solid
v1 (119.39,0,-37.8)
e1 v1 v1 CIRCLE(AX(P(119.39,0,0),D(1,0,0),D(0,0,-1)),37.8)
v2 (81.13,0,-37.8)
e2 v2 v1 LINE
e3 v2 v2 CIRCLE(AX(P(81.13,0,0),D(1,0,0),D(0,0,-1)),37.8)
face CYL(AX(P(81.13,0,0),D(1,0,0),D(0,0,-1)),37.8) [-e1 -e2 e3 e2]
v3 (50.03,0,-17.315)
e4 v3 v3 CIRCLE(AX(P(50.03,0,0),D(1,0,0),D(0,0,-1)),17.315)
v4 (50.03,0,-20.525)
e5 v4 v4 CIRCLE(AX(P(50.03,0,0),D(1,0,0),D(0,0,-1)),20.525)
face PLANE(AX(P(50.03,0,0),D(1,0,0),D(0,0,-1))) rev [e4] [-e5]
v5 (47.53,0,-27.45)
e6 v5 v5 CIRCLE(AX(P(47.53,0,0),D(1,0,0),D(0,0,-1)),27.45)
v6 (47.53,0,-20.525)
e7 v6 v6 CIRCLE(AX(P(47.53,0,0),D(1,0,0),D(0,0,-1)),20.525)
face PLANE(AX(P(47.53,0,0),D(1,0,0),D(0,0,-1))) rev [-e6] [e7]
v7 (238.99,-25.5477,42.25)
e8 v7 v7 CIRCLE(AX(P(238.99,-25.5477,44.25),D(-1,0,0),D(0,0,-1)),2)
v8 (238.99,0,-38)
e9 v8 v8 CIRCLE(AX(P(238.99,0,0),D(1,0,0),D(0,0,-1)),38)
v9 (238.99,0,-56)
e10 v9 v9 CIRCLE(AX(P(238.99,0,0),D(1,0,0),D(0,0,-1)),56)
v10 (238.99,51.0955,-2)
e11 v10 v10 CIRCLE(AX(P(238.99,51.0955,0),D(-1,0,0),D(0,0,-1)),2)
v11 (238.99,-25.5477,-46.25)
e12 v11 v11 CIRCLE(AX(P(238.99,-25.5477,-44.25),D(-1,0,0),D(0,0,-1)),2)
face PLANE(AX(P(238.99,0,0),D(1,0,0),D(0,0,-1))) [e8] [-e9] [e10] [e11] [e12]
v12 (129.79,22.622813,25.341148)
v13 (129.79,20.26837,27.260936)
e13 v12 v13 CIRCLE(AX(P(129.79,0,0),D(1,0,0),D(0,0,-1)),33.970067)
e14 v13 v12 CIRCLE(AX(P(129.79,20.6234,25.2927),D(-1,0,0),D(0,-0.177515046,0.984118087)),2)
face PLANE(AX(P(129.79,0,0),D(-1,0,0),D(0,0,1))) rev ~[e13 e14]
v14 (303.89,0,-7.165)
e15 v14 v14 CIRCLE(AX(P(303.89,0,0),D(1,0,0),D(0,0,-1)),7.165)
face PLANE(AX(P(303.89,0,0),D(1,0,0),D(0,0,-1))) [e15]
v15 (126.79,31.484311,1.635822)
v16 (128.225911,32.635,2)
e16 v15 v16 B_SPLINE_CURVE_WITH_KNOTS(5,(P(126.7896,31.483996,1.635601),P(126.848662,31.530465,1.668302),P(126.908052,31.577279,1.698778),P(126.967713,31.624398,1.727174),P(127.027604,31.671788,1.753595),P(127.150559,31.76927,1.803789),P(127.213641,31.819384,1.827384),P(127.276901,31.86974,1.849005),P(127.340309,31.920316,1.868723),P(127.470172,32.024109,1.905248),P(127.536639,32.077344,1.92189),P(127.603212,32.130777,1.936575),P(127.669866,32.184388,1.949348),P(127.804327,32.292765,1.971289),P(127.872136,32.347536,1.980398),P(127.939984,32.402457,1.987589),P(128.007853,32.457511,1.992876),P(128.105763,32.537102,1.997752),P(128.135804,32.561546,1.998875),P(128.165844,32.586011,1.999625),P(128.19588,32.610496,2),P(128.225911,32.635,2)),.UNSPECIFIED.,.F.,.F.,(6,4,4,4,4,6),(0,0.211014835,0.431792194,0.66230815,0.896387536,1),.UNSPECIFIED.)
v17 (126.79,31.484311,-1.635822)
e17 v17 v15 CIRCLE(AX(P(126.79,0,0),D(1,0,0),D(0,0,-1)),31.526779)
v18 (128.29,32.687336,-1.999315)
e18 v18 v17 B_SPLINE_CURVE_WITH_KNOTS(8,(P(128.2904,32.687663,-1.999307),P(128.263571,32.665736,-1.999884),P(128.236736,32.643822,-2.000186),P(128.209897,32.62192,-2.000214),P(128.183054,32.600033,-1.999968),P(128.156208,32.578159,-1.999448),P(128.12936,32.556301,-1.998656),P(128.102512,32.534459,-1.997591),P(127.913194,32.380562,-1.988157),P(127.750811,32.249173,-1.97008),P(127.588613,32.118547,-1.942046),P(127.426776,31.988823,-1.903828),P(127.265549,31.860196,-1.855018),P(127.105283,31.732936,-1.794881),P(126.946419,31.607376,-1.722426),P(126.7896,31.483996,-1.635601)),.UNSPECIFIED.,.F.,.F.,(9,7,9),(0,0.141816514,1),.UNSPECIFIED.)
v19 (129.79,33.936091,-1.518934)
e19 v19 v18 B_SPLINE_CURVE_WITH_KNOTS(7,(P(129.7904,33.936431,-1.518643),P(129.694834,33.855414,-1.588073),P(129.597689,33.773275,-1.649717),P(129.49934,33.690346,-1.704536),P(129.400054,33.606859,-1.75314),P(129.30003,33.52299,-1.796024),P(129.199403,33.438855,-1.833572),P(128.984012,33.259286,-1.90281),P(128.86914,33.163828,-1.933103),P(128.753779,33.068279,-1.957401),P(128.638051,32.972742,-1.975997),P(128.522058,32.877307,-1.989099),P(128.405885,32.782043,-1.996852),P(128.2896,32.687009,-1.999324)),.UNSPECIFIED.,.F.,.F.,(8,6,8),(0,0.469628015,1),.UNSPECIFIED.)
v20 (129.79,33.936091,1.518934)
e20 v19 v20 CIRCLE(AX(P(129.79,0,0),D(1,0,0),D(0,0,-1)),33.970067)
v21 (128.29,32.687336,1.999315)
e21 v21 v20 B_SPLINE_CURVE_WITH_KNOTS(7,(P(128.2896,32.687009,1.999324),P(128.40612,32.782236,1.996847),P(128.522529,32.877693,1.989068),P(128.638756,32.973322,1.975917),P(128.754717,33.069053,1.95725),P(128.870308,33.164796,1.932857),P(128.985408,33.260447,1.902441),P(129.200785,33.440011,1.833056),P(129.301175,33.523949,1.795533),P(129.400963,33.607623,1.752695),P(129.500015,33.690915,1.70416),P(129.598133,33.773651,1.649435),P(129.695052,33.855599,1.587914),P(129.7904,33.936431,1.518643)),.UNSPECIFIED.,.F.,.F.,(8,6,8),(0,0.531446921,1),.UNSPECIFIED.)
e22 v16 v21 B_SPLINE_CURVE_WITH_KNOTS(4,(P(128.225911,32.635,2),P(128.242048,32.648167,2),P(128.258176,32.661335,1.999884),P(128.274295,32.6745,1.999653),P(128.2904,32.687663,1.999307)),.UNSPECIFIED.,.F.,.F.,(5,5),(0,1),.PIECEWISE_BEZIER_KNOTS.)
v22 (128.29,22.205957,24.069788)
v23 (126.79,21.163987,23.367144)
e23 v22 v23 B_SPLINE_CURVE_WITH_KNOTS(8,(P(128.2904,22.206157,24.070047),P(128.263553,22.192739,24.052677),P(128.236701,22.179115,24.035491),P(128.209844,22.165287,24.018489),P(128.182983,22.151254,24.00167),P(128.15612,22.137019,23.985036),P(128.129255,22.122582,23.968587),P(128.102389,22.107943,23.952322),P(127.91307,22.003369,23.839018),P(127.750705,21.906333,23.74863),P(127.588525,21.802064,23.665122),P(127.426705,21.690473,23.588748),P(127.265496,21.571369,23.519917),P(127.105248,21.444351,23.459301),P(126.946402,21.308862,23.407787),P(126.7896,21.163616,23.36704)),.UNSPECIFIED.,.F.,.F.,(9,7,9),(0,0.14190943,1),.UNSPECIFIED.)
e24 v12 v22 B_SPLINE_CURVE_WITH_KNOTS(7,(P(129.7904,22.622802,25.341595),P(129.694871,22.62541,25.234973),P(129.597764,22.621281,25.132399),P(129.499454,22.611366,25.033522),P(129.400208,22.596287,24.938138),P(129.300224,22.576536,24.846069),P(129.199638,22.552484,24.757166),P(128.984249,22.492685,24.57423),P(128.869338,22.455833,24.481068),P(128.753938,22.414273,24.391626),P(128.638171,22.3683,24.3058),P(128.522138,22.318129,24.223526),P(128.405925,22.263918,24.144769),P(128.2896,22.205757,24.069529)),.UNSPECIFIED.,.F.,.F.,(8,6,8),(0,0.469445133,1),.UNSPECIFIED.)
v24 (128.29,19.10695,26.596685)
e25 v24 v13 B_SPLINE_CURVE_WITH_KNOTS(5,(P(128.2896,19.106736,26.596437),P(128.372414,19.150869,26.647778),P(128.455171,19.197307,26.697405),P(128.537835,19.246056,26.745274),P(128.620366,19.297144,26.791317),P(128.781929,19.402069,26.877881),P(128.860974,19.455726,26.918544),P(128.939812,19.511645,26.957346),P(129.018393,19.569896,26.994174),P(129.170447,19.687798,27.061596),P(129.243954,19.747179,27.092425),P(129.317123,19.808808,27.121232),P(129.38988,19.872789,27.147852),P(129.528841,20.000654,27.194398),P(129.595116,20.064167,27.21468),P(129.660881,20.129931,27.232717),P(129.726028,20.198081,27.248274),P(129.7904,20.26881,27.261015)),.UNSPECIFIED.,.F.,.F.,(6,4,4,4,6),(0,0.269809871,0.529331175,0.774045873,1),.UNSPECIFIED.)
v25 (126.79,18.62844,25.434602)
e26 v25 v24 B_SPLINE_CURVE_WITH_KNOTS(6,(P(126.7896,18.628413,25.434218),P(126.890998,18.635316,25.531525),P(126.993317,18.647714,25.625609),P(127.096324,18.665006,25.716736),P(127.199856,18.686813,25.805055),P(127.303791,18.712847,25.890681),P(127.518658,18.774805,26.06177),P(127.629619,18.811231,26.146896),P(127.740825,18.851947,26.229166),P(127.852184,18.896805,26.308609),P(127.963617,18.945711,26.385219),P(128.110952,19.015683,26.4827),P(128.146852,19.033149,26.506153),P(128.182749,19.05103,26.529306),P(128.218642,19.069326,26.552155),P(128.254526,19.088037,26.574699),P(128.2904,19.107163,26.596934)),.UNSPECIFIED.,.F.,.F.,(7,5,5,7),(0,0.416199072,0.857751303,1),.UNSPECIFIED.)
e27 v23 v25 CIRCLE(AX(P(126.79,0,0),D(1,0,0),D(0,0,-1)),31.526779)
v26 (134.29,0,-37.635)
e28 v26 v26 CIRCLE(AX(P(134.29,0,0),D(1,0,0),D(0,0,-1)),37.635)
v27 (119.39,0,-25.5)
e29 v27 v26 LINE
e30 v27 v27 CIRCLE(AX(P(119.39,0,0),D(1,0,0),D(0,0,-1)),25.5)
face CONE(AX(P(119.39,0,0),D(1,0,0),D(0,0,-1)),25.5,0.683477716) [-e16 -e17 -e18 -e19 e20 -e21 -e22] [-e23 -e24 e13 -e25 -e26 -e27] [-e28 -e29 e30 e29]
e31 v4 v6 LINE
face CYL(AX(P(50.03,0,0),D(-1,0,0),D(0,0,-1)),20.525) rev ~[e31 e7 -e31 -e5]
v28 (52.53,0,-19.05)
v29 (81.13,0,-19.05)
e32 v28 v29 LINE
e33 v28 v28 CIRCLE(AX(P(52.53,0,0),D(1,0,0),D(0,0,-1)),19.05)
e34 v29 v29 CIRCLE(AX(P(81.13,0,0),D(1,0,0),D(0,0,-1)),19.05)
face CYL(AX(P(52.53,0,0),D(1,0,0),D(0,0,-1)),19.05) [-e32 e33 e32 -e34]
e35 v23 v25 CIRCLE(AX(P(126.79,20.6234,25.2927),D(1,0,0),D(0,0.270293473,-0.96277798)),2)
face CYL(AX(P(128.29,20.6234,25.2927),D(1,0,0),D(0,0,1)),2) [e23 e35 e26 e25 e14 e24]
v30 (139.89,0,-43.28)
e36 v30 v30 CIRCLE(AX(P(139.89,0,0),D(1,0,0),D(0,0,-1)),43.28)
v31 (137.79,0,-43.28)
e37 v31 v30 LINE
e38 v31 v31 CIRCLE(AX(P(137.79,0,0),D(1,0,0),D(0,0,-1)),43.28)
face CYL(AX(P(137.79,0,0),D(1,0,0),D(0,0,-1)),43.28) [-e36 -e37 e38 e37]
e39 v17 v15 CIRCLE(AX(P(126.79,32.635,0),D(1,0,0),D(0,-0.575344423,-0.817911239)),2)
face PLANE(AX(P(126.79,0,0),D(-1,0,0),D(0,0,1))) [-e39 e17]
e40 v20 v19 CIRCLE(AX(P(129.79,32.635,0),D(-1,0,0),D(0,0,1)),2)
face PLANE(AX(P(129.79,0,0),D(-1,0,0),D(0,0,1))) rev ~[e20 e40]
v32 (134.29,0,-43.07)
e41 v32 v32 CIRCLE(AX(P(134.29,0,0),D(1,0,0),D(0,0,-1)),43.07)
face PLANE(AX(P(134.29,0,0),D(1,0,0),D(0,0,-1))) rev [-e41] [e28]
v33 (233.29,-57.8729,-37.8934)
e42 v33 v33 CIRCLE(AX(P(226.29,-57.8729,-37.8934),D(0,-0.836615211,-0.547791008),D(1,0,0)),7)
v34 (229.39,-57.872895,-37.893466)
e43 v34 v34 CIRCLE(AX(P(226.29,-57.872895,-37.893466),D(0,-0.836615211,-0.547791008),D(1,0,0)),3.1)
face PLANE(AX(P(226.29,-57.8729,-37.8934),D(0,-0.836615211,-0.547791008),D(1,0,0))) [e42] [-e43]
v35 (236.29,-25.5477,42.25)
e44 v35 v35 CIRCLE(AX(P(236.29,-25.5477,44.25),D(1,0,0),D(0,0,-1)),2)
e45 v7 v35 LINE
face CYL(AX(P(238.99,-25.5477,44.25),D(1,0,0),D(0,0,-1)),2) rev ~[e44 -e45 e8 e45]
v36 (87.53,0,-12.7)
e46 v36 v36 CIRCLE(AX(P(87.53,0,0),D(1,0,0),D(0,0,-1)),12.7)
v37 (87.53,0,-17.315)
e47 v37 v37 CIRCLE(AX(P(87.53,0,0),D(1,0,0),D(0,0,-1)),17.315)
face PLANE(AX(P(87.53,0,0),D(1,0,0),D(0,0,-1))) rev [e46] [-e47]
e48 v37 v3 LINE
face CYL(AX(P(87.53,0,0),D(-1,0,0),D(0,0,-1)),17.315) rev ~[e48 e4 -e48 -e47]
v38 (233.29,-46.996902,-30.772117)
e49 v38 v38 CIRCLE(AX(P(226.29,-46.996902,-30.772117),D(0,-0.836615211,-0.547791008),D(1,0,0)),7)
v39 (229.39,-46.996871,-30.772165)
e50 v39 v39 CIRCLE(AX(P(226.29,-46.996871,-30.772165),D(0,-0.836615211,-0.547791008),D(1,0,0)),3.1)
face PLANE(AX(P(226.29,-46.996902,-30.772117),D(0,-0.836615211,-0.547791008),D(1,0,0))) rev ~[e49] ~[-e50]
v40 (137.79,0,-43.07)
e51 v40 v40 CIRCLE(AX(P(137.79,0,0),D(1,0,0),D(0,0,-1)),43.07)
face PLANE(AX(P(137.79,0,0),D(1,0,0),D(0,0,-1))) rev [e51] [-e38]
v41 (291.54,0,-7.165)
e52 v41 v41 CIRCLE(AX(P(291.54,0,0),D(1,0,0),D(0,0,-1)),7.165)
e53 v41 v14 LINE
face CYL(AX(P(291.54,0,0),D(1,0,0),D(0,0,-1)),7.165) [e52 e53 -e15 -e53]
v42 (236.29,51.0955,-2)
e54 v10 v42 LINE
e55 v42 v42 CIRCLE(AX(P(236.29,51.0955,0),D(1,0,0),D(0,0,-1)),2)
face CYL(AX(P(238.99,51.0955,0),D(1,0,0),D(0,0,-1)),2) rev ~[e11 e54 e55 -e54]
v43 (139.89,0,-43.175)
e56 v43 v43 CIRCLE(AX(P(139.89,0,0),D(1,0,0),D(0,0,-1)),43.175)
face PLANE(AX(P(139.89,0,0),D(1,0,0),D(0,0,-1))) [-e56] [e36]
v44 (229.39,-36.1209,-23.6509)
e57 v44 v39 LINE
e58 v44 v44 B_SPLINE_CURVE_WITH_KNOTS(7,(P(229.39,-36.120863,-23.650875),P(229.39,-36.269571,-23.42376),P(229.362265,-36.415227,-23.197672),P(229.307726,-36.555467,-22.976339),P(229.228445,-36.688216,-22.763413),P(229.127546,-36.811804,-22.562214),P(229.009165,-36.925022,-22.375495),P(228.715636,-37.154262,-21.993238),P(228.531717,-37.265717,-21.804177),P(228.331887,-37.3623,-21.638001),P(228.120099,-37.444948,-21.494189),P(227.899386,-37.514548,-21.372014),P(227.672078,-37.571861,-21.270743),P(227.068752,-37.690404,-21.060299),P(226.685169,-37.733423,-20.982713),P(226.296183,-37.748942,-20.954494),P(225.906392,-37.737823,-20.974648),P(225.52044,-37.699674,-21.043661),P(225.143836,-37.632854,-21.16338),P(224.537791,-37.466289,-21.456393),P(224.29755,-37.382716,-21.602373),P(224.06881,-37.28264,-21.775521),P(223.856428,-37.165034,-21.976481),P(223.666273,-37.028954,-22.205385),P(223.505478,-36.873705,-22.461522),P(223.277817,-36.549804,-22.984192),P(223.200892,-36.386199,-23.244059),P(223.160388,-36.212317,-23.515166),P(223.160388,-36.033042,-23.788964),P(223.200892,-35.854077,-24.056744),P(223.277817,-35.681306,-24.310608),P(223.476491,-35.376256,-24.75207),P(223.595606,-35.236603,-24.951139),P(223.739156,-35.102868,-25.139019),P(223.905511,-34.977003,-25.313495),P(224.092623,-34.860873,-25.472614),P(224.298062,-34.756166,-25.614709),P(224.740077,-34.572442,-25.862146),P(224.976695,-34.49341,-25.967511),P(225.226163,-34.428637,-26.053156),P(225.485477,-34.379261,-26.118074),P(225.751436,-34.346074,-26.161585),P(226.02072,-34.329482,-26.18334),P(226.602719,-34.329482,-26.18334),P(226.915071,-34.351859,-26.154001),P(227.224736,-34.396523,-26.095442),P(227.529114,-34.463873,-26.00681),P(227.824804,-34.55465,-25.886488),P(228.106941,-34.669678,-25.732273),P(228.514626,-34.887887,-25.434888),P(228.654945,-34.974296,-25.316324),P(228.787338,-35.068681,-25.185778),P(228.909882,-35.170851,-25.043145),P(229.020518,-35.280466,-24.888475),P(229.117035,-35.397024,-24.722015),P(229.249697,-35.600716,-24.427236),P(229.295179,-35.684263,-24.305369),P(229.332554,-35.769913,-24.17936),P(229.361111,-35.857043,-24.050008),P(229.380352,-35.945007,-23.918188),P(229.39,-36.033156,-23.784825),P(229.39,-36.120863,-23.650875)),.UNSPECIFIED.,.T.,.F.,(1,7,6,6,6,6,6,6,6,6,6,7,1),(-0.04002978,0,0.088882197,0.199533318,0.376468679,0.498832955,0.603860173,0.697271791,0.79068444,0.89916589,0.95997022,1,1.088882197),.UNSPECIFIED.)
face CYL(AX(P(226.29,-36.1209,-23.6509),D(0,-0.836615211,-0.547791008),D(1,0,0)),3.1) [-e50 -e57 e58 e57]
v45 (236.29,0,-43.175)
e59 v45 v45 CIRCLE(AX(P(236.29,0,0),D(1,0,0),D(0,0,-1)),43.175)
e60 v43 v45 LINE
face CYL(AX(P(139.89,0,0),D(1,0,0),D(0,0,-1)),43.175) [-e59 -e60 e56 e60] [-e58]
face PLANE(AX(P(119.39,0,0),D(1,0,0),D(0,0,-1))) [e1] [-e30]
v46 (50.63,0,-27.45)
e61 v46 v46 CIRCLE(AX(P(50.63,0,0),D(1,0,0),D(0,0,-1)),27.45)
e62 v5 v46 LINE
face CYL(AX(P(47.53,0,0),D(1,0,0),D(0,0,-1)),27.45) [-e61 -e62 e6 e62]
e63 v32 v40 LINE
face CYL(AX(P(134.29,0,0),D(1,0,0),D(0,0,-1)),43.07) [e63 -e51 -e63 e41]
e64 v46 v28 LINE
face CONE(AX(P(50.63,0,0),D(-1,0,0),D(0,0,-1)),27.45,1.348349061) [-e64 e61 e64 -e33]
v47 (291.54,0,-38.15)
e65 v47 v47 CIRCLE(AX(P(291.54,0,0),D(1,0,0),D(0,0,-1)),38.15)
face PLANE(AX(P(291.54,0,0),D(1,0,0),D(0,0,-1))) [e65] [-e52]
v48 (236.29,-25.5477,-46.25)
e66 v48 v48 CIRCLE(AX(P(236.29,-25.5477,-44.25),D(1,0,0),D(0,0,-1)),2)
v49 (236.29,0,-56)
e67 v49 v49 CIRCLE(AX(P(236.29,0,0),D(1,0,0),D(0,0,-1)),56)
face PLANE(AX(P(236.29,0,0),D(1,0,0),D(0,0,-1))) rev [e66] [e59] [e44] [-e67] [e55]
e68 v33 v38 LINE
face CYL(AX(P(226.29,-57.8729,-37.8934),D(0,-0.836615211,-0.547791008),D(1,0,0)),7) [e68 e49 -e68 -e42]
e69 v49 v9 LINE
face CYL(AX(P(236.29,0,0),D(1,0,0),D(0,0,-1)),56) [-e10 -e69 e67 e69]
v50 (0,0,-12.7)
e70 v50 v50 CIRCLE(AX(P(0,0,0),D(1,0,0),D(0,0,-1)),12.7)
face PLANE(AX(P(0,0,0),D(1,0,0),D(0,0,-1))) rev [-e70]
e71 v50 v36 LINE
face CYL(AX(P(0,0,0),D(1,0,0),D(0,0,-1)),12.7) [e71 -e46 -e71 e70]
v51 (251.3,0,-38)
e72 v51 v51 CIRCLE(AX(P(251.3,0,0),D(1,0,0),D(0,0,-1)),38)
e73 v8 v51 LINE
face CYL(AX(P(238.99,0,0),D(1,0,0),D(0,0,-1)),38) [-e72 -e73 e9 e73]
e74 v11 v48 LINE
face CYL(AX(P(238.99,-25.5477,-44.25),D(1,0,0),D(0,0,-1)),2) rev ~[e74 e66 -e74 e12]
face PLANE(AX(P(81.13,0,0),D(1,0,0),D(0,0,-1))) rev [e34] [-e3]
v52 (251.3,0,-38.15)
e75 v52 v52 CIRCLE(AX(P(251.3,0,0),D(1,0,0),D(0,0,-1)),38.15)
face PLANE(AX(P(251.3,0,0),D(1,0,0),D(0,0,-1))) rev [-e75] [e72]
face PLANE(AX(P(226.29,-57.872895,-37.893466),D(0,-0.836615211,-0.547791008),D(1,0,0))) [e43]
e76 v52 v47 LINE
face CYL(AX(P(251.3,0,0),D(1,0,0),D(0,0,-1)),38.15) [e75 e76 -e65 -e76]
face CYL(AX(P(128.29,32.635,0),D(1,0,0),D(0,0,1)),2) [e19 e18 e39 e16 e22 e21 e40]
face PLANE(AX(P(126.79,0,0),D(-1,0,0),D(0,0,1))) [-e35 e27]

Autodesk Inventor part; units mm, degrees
sketch "Sketch1" plane through (0, 0, 0) normal (0, 1, 0) x (-1, 0, 0)
  line L0 (0, 0) -> (-303.89, 0)
  line L1 (0, 0) -> (0, -12.7)
  line L2 (0, -12.7) -> (-87.53, -12.7)
  line L3 (-87.53, -12.7) -> (-87.53, -17.315)
  line L4 (-87.53, -17.315) -> (-50.03, -17.315)
  line L5 (-50.03, -17.315) -> (-50.03, -20.525)
  line L6 (-50.03, -20.525) -> (-47.53, -20.525)
  line L7 (-47.53, -20.525) -> (-47.53, -27.45)
  line L8 (-47.53, -27.45) -> (-50.63, -27.45)
  line L9 (-50.63, -27.45) -> (-52.53, -19.05)
  line L10 (-52.53, -19.05) -> (-81.13, -19.05)
  line L11 (-81.13, -19.05) -> (-81.13, -37.8)
  line L12 (-81.13, -37.8) -> (-119.39, -37.8)
  line L13 (-119.39, -37.8) -> (-119.39, -25.5)
  line L14 (-119.39, -25.5) -> (-134.29, -37.635)
  line L15 (-134.29, -37.635) -> (-134.29, -43.07)
  line L16 (-134.29, -43.07) -> (-137.79, -43.07)
  line L17 (-137.79, -43.07) -> (-137.79, -43.28)
  line L18 (-137.79, -43.28) -> (-139.89, -43.28)
  line L19 (-139.89, -43.28) -> (-139.89, -43.175)
  line L20 (-139.89, -43.175) -> (-236.29, -43.175)
  line L21 (-236.29, -43.175) -> (-236.29, -56)
  line L22 (-236.29, -56) -> (-238.99, -56)
  line L23 (-238.99, -56) -> (-238.99, 0)
  line L24 (-251.3, 0) -> (-251.3, -38.15)
  line L25 (-251.3, -38.15) -> (-291.54, -38.15)
  line L26 (-291.54, -38.15) -> (-291.54, -7.165)
  line L27 (-291.54, -7.165) -> (-303.89, -7.165)
  line L28 (-303.89, -7.165) -> (-303.89, 0)
  line L29 (-238.99, -38) -> (-251.3, -38)
  line L30 (-251.3, -38) -> (-251.3, 0)
  line L31 (-251.3, 0) -> (-238.99, 0)
  line L32 (-238.99, 0) -> (-238.99, -38)
  dimension "d0" = 303.89
  dimension "d1" = 12.7
  dimension "d2" = 87.53
  dimension "d3" = 4.615
  dimension "d4" = 37.5
  dimension "d5" = 3.21
  dimension "d6" = 2.5
  dimension "d7" = 27.45
  dimension "d8" = 3.1
  dimension "d9" = 5
  dimension "d10" = 19.05
  dimension "d11" = 30.5
  dimension "d12" = 37.8
  dimension "d13" = 38.26
  dimension "d14" = 12.3
  dimension "d16" = 14.9
  dimension "d17" = 37.635
  dimension "d18" = 43.07
  dimension "d19" = 3.5
  dimension "d20" = 43.28
  dimension "d21" = 2.1
  dimension "d22" = 43.175
  dimension "d24" = 56
  dimension "d25" = 104.7
  dimension "d26" = 12.31
  dimension "d27" = 157.25
  dimension "d28" = 38.15
  dimension "d29" = 90
  dimension "d30" = 7.165
  dimension "d31" = 12.35
  dimension "d54" = 2.7
  dimension "d55" = 38
  dimension "d77" = 25.5
  dimension "d78" = 102
revolve "Revolution1" add sketch "Sketch1" angle 360 about axis through (0, 0, 0) along (1, 0, 0)
ref_plane "Work Plane1" through (236.99, 0, 0) normal (1, 0, 0) x (0, 0, -1)
ref_plane "Work Plane2" through (236.99, 52.5583, -19.3295) normal (0, 0.9385405, -0.3451692) x (-1, 0, 0)
sketch "Sketch6" plane through (238.99, 0, 0) normal (1, 0, 0) x (0, 0, -1)
  line L0 (44.25, -25.5477) -> (-44.25, -25.5477)
  line L1 (-44.25, -25.5477) -> (0, 51.0955)
  line L2 (0, 51.0955) -> (44.25, -25.5477)
  circle A0 centre (0, 51.0955) radius 2
  circle A1 centre (44.25, -25.5477) radius 2
  circle A2 centre (-44.25, -25.5477) radius 2
  point P0 (0, 0)
  point P1 (0, 0)
  dimension "d56" = 4
  dimension "d57" = 88.5
extrude "Extrusion3" cut sketch "Sketch6" against normal up to surface (2.7 mm away) contours A2 L1 L0 | L0 L1 A2 | A1 L2 L0 | L0 L2 A1 | A0 L2 L1 | L1 L2 A0
ref_plane "Work Plane3" through (128.29, 0, 0) normal (-1, 0, 0) x (0, 0, 1)
sketch "Sketch7" plane through (128.29, 0, 0) normal (-1, 0, 0) x (0, 0, 1)
  circle A0 centre (0, 51.0955) radius 2 projected
  circle A1 centre (0, 0) radius 25.5 projected
  circle A2 centre (0, 0) radius 37.635 projected
  circle A3 centre (0, 0) radius 32.635 construction
  circle A4 centre (0, 32.635) radius 2
  circle A5 centre (25.2927, 20.6234) radius 2
  dimension "d61" = 5
  dimension "d62" = 4
  dimension "d64" = 28
extrude "Extrusion4" add sketch "Sketch7" along normal mid plane 3 contours A4 | A5
ref_plane "Work Plane4" through (226.29, 0, 0) normal (-1, 0, 0) x (0, 0, 1)
sketch "Sketch8" plane through (226.29, 0, 0) normal (-1, 0, 0) x (0, 0, 1)
  circle A0 centre (0, 0) radius 43.175 projected
  circle A1 centre (0, 0) radius 43.175 projected
  circle A2 centre (-44.25, -25.5477) radius 2 projected
  line L0 (-44.25, -25.5477) -> (-37.3906, -21.5875) construction
  point P0 (-23.6509, -36.1209)
  dimension "d68" = 20
ref_plane "Work Plane5" through (226.29, -36.1209, -23.6509) normal (0, -0.8366152, -0.547791) x (1, 0, 0)
sketch "Sketch9" plane through (226.29, -36.1209, -23.6509) normal (0, -0.8366152, -0.547791) x (1, 0, 0)
  circle A0 centre (0, 0) radius 3.1
  point P0 (-226.29, 0)
  dimension "d69" = 6.2
extrude "Extrusion5" add sketch "Sketch9" along normal blind 26 and the other way blind 1
sketch "Sketch10" plane through (226.29, -57.8729, -37.8934) normal (0, -0.8366152, -0.547791) x (1, 0, 0)
  circle A0 centre (0, 0) radius 3.1 projected
  circle A1 centre (0, 0) radius 7
  point P0 (-226.29, 0)
  dimension "d74" = 14
extrude "Extrusion6" add sketch "Sketch10" against normal blind 13 contours A0 | A1
properties part number "STI Hybrid 98 Cryocooler - Full Flange"
